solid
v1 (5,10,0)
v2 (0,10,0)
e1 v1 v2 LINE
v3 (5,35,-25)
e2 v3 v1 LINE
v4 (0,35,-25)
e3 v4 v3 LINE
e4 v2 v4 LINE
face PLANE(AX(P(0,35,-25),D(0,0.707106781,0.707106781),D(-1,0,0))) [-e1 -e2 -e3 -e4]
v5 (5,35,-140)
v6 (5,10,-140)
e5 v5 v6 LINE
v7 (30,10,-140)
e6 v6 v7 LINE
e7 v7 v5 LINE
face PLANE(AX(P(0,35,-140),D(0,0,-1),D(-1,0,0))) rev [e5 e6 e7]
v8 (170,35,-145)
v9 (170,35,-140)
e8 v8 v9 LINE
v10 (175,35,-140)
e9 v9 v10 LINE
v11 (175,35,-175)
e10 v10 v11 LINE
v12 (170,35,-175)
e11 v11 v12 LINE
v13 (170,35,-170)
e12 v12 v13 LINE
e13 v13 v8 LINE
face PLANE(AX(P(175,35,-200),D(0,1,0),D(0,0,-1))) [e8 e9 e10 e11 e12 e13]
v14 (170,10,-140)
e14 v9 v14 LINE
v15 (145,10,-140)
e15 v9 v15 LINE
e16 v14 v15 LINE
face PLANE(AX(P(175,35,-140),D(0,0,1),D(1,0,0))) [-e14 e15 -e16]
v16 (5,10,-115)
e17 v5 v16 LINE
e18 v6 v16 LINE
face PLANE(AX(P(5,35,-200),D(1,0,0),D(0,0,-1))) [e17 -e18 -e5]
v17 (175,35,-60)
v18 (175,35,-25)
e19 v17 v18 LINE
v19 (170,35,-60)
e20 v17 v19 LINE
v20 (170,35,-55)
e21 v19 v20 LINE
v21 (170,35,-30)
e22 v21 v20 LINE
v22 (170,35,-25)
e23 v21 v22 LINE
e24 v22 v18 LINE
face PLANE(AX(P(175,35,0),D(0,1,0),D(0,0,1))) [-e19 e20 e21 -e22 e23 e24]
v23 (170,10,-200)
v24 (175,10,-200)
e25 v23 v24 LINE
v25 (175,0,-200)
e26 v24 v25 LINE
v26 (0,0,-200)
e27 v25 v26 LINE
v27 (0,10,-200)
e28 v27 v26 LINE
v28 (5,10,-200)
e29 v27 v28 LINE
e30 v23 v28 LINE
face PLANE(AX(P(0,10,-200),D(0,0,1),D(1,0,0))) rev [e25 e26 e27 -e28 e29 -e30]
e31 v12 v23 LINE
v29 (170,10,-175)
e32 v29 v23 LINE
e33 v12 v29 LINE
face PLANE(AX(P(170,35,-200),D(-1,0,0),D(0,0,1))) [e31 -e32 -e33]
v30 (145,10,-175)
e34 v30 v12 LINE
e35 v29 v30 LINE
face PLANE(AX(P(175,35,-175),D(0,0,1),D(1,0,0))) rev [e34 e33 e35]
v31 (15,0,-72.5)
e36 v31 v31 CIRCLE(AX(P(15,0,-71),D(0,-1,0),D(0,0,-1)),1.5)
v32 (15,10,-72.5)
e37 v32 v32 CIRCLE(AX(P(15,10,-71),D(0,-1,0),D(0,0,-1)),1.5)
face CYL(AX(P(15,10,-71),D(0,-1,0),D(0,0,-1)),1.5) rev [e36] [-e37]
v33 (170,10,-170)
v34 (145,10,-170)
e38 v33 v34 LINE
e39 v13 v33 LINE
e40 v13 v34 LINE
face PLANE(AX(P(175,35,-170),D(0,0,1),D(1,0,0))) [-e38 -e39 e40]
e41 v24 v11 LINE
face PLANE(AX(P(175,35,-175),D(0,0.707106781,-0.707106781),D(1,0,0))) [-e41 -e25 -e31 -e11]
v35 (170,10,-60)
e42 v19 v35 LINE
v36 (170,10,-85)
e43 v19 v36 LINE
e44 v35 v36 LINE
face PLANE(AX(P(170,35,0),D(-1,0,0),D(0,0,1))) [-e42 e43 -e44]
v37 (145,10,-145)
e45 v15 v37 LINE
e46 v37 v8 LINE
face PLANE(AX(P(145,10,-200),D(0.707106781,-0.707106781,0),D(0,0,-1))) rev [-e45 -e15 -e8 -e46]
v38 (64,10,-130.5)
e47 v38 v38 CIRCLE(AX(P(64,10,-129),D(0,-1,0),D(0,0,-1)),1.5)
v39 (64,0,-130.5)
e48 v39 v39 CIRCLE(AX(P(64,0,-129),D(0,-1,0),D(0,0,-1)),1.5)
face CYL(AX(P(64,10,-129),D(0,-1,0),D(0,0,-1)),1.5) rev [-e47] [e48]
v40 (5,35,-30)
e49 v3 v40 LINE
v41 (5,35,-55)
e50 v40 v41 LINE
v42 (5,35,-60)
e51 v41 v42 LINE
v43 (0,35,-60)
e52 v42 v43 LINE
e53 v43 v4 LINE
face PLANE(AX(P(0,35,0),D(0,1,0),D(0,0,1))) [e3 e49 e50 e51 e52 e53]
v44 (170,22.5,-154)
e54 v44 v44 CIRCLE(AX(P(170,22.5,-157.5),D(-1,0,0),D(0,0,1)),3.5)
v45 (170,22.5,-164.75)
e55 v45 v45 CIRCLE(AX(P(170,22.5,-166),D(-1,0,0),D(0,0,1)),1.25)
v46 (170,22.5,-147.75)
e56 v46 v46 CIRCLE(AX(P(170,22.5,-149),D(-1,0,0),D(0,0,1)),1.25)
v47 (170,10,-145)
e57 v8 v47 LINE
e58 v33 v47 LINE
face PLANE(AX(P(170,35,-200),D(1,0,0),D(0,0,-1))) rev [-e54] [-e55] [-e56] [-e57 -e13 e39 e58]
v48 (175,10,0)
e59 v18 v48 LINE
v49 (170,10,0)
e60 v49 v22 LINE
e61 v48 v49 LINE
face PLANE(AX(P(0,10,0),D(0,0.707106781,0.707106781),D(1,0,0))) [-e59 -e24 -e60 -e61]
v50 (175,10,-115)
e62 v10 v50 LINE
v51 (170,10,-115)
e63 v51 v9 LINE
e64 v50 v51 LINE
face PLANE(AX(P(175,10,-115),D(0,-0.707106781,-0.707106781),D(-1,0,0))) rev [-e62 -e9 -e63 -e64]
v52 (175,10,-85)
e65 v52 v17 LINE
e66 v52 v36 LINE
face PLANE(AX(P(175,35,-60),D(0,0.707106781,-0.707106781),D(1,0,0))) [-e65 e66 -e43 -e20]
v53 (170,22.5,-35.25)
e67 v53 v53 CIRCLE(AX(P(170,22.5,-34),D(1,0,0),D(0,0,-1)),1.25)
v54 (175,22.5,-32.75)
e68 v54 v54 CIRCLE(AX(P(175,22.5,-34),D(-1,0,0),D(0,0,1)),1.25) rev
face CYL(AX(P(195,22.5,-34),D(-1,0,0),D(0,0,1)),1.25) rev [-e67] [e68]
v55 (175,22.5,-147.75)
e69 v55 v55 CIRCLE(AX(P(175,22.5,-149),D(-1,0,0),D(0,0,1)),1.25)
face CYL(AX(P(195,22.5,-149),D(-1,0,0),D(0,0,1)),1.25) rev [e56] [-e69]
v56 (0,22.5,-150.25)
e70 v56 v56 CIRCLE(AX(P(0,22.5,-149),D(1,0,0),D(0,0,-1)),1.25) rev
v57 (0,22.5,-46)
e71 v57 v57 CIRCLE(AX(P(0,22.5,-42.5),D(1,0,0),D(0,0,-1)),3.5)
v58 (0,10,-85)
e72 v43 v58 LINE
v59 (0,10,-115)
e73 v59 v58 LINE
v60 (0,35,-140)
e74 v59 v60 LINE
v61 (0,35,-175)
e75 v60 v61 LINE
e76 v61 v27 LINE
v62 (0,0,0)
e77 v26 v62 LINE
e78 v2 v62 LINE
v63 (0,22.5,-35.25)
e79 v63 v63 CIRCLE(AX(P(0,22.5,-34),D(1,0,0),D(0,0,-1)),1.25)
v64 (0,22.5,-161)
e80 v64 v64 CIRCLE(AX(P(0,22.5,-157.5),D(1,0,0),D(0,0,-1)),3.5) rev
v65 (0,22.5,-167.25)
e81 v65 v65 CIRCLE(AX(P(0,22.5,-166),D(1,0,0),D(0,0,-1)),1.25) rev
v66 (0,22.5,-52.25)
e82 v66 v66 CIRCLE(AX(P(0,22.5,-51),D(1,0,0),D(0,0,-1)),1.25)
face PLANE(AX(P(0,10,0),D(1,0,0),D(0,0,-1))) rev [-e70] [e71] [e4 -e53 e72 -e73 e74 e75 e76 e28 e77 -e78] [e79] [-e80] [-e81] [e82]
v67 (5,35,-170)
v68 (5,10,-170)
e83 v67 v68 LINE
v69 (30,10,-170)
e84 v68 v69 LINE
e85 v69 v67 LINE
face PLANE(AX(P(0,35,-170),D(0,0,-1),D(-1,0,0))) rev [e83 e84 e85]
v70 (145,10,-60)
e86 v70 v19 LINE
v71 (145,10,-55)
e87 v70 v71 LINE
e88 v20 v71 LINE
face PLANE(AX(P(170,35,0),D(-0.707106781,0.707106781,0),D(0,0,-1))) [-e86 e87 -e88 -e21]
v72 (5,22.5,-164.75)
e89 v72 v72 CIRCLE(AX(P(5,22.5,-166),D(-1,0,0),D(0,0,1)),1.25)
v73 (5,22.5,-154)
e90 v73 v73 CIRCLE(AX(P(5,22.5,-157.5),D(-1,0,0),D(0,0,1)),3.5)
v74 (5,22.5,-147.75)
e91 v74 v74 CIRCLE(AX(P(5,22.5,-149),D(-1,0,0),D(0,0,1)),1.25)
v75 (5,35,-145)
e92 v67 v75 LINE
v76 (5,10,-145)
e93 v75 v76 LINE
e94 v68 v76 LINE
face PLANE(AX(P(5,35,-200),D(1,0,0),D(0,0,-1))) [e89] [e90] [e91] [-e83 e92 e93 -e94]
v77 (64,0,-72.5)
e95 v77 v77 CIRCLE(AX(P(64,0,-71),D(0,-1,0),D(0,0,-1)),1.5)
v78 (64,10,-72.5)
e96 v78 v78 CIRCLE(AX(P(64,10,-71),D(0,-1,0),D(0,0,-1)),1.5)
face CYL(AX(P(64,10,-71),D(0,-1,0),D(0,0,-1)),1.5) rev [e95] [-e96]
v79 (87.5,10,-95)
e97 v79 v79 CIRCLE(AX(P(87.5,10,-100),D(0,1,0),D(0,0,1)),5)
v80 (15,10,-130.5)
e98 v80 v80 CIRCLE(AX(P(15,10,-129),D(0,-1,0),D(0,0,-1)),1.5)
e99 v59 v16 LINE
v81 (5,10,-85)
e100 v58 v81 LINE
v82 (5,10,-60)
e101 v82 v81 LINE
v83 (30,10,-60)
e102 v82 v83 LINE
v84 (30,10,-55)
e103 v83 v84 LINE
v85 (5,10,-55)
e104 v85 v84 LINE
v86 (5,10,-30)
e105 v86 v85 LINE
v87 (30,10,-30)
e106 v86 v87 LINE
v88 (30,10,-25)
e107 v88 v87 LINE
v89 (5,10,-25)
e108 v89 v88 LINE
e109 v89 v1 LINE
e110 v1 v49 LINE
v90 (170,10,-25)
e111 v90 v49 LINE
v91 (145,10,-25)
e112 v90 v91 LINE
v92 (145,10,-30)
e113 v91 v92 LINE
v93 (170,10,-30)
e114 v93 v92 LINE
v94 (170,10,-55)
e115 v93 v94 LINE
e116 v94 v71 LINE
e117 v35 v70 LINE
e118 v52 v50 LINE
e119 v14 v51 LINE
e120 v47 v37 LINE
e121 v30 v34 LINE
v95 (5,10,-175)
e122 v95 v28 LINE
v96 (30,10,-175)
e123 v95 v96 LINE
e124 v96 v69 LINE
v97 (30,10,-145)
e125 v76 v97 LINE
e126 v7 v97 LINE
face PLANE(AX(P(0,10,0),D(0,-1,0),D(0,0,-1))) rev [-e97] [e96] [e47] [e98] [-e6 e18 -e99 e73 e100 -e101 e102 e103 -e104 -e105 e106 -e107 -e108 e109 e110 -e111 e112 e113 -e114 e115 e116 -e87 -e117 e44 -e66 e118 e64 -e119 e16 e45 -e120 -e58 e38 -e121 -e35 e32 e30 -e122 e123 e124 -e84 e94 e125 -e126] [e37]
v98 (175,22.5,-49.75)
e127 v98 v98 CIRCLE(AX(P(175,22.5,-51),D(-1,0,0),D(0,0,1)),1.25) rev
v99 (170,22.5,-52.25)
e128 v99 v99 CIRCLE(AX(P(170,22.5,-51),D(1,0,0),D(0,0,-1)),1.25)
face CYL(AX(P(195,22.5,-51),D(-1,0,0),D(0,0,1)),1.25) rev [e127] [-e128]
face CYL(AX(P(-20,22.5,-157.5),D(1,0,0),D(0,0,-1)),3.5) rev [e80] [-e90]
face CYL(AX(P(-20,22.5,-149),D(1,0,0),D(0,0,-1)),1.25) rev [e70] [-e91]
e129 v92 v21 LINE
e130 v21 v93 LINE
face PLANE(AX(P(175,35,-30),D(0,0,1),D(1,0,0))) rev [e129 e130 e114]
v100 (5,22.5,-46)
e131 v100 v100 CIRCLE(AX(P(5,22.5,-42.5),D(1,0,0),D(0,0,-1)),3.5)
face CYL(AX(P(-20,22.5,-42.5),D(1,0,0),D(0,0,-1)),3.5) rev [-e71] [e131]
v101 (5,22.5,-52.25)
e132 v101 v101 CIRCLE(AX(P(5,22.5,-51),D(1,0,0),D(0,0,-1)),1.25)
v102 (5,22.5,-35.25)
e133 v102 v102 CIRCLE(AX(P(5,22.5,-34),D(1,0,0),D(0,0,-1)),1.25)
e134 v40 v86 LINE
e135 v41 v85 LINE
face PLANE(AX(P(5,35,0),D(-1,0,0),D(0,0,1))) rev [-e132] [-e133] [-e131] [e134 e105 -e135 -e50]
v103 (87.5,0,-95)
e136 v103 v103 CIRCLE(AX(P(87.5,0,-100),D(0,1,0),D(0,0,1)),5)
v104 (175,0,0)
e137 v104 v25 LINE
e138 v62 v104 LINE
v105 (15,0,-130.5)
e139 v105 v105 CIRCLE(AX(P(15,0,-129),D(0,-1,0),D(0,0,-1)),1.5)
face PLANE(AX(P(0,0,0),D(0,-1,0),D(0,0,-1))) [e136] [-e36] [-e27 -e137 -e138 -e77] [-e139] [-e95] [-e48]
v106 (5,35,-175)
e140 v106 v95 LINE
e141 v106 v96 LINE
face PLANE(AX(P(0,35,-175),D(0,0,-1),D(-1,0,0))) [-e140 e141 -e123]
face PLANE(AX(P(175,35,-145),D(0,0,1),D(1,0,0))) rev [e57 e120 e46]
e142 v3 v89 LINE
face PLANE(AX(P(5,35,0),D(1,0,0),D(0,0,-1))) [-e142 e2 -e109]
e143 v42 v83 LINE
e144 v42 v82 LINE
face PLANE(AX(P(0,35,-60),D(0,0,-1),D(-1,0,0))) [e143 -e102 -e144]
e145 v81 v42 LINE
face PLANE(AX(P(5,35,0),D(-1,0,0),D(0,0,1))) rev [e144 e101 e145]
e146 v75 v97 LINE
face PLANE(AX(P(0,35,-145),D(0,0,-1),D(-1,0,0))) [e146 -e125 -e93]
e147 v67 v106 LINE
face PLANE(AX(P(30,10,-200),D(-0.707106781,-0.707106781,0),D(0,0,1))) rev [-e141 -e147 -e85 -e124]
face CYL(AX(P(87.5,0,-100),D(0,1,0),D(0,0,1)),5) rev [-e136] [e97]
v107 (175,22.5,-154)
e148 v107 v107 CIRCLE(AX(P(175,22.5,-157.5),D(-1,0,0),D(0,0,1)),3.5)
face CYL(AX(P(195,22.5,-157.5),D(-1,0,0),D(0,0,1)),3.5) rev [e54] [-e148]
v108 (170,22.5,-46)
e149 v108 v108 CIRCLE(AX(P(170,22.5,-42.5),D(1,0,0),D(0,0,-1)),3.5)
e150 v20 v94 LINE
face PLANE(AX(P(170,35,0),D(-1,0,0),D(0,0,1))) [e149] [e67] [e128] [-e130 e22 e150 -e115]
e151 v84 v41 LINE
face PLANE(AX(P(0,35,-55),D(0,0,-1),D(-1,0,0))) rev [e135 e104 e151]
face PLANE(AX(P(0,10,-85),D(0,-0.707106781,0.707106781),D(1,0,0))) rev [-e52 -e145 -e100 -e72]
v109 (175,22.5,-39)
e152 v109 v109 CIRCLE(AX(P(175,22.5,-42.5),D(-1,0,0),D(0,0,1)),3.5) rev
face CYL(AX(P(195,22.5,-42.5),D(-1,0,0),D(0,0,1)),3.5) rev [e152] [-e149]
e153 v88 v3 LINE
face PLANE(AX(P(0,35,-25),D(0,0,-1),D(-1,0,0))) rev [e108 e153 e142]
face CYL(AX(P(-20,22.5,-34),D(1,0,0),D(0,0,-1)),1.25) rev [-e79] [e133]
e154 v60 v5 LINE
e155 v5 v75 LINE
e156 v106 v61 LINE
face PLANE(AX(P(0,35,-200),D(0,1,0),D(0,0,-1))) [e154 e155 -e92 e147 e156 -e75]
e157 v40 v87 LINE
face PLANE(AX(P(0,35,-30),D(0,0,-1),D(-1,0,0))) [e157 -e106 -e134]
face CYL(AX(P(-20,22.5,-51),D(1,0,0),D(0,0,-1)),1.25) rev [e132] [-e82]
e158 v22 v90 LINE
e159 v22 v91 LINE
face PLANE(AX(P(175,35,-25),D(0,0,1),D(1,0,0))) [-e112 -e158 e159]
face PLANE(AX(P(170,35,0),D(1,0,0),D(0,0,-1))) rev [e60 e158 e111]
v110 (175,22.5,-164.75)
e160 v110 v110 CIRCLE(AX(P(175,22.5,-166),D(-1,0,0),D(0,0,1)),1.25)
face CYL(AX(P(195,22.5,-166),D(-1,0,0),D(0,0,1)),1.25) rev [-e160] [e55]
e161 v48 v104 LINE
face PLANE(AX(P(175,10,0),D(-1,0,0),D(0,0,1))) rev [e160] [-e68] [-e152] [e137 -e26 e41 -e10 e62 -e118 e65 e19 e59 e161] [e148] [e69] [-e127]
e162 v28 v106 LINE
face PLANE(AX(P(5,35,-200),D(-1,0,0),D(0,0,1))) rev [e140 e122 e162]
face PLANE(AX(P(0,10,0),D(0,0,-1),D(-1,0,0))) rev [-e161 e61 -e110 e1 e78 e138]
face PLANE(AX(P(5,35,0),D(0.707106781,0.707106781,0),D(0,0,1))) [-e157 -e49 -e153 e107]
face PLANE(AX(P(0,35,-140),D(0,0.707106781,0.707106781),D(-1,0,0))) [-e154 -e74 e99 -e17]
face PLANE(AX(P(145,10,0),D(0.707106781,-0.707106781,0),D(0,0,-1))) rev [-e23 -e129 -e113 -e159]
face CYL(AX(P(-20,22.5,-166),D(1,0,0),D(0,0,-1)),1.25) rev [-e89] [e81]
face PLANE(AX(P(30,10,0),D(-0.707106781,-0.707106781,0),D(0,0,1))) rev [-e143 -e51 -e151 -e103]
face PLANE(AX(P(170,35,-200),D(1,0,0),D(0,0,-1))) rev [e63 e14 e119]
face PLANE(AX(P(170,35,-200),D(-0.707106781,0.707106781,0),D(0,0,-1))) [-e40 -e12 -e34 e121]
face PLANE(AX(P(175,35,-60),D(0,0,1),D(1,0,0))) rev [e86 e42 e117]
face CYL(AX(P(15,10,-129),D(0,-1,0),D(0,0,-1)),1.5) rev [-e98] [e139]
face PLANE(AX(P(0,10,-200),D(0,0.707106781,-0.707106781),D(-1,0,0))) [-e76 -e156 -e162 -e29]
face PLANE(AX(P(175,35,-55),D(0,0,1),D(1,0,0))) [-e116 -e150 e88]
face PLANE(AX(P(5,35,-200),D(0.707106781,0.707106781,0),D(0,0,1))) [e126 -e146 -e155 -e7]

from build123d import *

# Parameters (mm, degrees)
SKETCH1_W                = 175
SKETCH1_H                = 200
BOSS_EXTRUDE1_DEPTH      = 10
SKETCH3_W                = 5
SKETCH3_H                = 25
SKETCH3_W_2              = 25
SKETCH3_H_2              = 5
BOSS_EXTRUDE2_DEPTH      = 25
CHAMFER1_SIZE            = 25
SKETCH4_R                = 3.5
SKETCH4_R_2              = 1.25
CUT_EXTRUDE1_DEPTH       = 25
CHAMFER1_OF_MIRROR1_SIZE = 25
SKETCH5_R                = 5
CUT_EXTRUDE2_DEPTH       = 10
SKETCH6_R                = 1.5
CUT_EXTRUDE3_DEPTH       = 10


# Read off the part's stored shape, not the designer's step: Mirror2
with BuildPart() as part:
    # Sketch1 → Boss-Extrude1 (new body)
    with BuildSketch(Plane(origin=(0, 0, 0), x_dir=(1, 0, 0), z_dir=(0, 1, 0))):
        with Locations((87.5, 100)):
            Rectangle(SKETCH1_W, SKETCH1_H)
    extrude(amount=BOSS_EXTRUDE1_DEPTH)

    # Sketch3 → Boss-Extrude2 (add)
    with BuildSketch(Plane(origin=(0, 10, 0), x_dir=(1, 0, 0), z_dir=(0, 1, 0))):
        with Locations((2.5, 72.5)):
            Rectangle(SKETCH3_W, SKETCH3_H)
        Polygon((0, 60), (0, 25), (5, 25), (5, 30), (5, 55), (5, 60), align=None)
        with Locations((17.5, 57.5)):
            Rectangle(SKETCH3_W_2, SKETCH3_H_2)
        with Locations((17.5, 27.5)):
            Rectangle(SKETCH3_W_2, SKETCH3_H_2)
        with Locations((2.5, 12.5)):
            Rectangle(SKETCH3_W, SKETCH3_H)
    boss_extrude2 = extrude(amount=BOSS_EXTRUDE2_DEPTH)

    # Chamfer1
    chamfer1_edges = [part.edges().sort_by_distance(p)[0] for p in [
        (2.5, 35, -85),
        (30, 35, -57.5),
        (30, 35, -27.5),
        (2.5, 35, 0),
    ]]
    chamfer(chamfer1_edges, length=CHAMFER1_SIZE - 0.0001)  # a hair under: the kernel refuses the full size

    # Sketch4 → Cut-Extrude1 (cut)
    with BuildSketch(Plane(origin=(5, 0, 0), x_dir=(0, 0, -1), z_dir=(1, 0, 0))):
        with Locations((42.5, 22.5)):
            Circle(SKETCH4_R)
        with Locations((34, 22.5)):
            Circle(SKETCH4_R_2)
        with Locations((51, 22.5)):
            Circle(SKETCH4_R_2)
    cut_extrude1 = extrude(amount=-CUT_EXTRUDE1_DEPTH, mode=Mode.SUBTRACT)

    # Mirror1: Boss-Extrude2, Cut-Extrude1 across plane
    add(boss_extrude2.mirror(Plane(origin=(87.5, 0, 0), x_dir=(0, 0, 1), z_dir=(1, 0, 0))))
    add(cut_extrude1.mirror(Plane(origin=(87.5, 0, 0), x_dir=(0, 0, 1), z_dir=(1, 0, 0))), mode=Mode.SUBTRACT)

    # Chamfer1 of Mirror1
    chamfer1_of_mirror1_edges = [part.edges().sort_by_distance(p)[0] for p in [
        (172.5, 35, -85),
        (145, 35, -57.5),
        (145, 35, -27.5),
        (172.5, 35, 0),
    ]]
    chamfer(chamfer1_of_mirror1_edges, length=CHAMFER1_OF_MIRROR1_SIZE - 0.0001)  # a hair under: the kernel refuses the full size

    # Mirror2: part across plane


with BuildPart() as part_1:
    add(part.part)
    add(part.part.mirror(Plane.XY.offset(-100)))

    # Sketch5 → Cut-Extrude2 (cut)
    with BuildSketch(Plane(origin=(0, 10, 0), x_dir=(1, 0, 0), z_dir=(0, 1, 0))):
        with Locations(Location((87.5, 100, 0), (0, 0, 270))):
            Circle(SKETCH5_R)
    extrude(amount=-CUT_EXTRUDE2_DEPTH, mode=Mode.SUBTRACT)

    # Sketch6 → Cut-Extrude3 (cut)
    with BuildSketch(Plane.XZ):
        with Locations(Location((15, -71, 0), (0, 0, 270))):
            Circle(SKETCH6_R)
        with Locations(Location((64, -71, 0), (0, 0, 270))):
            Circle(SKETCH6_R)
        with Locations(Location((15, -129, 0), (0, 0, 270))):
            Circle(SKETCH6_R)
        with Locations(Location((64, -129, 0), (0, 0, 270))):
            Circle(SKETCH6_R)
    extrude(amount=-CUT_EXTRUDE3_DEPTH, mode=Mode.SUBTRACT)


solid = part_1.part
